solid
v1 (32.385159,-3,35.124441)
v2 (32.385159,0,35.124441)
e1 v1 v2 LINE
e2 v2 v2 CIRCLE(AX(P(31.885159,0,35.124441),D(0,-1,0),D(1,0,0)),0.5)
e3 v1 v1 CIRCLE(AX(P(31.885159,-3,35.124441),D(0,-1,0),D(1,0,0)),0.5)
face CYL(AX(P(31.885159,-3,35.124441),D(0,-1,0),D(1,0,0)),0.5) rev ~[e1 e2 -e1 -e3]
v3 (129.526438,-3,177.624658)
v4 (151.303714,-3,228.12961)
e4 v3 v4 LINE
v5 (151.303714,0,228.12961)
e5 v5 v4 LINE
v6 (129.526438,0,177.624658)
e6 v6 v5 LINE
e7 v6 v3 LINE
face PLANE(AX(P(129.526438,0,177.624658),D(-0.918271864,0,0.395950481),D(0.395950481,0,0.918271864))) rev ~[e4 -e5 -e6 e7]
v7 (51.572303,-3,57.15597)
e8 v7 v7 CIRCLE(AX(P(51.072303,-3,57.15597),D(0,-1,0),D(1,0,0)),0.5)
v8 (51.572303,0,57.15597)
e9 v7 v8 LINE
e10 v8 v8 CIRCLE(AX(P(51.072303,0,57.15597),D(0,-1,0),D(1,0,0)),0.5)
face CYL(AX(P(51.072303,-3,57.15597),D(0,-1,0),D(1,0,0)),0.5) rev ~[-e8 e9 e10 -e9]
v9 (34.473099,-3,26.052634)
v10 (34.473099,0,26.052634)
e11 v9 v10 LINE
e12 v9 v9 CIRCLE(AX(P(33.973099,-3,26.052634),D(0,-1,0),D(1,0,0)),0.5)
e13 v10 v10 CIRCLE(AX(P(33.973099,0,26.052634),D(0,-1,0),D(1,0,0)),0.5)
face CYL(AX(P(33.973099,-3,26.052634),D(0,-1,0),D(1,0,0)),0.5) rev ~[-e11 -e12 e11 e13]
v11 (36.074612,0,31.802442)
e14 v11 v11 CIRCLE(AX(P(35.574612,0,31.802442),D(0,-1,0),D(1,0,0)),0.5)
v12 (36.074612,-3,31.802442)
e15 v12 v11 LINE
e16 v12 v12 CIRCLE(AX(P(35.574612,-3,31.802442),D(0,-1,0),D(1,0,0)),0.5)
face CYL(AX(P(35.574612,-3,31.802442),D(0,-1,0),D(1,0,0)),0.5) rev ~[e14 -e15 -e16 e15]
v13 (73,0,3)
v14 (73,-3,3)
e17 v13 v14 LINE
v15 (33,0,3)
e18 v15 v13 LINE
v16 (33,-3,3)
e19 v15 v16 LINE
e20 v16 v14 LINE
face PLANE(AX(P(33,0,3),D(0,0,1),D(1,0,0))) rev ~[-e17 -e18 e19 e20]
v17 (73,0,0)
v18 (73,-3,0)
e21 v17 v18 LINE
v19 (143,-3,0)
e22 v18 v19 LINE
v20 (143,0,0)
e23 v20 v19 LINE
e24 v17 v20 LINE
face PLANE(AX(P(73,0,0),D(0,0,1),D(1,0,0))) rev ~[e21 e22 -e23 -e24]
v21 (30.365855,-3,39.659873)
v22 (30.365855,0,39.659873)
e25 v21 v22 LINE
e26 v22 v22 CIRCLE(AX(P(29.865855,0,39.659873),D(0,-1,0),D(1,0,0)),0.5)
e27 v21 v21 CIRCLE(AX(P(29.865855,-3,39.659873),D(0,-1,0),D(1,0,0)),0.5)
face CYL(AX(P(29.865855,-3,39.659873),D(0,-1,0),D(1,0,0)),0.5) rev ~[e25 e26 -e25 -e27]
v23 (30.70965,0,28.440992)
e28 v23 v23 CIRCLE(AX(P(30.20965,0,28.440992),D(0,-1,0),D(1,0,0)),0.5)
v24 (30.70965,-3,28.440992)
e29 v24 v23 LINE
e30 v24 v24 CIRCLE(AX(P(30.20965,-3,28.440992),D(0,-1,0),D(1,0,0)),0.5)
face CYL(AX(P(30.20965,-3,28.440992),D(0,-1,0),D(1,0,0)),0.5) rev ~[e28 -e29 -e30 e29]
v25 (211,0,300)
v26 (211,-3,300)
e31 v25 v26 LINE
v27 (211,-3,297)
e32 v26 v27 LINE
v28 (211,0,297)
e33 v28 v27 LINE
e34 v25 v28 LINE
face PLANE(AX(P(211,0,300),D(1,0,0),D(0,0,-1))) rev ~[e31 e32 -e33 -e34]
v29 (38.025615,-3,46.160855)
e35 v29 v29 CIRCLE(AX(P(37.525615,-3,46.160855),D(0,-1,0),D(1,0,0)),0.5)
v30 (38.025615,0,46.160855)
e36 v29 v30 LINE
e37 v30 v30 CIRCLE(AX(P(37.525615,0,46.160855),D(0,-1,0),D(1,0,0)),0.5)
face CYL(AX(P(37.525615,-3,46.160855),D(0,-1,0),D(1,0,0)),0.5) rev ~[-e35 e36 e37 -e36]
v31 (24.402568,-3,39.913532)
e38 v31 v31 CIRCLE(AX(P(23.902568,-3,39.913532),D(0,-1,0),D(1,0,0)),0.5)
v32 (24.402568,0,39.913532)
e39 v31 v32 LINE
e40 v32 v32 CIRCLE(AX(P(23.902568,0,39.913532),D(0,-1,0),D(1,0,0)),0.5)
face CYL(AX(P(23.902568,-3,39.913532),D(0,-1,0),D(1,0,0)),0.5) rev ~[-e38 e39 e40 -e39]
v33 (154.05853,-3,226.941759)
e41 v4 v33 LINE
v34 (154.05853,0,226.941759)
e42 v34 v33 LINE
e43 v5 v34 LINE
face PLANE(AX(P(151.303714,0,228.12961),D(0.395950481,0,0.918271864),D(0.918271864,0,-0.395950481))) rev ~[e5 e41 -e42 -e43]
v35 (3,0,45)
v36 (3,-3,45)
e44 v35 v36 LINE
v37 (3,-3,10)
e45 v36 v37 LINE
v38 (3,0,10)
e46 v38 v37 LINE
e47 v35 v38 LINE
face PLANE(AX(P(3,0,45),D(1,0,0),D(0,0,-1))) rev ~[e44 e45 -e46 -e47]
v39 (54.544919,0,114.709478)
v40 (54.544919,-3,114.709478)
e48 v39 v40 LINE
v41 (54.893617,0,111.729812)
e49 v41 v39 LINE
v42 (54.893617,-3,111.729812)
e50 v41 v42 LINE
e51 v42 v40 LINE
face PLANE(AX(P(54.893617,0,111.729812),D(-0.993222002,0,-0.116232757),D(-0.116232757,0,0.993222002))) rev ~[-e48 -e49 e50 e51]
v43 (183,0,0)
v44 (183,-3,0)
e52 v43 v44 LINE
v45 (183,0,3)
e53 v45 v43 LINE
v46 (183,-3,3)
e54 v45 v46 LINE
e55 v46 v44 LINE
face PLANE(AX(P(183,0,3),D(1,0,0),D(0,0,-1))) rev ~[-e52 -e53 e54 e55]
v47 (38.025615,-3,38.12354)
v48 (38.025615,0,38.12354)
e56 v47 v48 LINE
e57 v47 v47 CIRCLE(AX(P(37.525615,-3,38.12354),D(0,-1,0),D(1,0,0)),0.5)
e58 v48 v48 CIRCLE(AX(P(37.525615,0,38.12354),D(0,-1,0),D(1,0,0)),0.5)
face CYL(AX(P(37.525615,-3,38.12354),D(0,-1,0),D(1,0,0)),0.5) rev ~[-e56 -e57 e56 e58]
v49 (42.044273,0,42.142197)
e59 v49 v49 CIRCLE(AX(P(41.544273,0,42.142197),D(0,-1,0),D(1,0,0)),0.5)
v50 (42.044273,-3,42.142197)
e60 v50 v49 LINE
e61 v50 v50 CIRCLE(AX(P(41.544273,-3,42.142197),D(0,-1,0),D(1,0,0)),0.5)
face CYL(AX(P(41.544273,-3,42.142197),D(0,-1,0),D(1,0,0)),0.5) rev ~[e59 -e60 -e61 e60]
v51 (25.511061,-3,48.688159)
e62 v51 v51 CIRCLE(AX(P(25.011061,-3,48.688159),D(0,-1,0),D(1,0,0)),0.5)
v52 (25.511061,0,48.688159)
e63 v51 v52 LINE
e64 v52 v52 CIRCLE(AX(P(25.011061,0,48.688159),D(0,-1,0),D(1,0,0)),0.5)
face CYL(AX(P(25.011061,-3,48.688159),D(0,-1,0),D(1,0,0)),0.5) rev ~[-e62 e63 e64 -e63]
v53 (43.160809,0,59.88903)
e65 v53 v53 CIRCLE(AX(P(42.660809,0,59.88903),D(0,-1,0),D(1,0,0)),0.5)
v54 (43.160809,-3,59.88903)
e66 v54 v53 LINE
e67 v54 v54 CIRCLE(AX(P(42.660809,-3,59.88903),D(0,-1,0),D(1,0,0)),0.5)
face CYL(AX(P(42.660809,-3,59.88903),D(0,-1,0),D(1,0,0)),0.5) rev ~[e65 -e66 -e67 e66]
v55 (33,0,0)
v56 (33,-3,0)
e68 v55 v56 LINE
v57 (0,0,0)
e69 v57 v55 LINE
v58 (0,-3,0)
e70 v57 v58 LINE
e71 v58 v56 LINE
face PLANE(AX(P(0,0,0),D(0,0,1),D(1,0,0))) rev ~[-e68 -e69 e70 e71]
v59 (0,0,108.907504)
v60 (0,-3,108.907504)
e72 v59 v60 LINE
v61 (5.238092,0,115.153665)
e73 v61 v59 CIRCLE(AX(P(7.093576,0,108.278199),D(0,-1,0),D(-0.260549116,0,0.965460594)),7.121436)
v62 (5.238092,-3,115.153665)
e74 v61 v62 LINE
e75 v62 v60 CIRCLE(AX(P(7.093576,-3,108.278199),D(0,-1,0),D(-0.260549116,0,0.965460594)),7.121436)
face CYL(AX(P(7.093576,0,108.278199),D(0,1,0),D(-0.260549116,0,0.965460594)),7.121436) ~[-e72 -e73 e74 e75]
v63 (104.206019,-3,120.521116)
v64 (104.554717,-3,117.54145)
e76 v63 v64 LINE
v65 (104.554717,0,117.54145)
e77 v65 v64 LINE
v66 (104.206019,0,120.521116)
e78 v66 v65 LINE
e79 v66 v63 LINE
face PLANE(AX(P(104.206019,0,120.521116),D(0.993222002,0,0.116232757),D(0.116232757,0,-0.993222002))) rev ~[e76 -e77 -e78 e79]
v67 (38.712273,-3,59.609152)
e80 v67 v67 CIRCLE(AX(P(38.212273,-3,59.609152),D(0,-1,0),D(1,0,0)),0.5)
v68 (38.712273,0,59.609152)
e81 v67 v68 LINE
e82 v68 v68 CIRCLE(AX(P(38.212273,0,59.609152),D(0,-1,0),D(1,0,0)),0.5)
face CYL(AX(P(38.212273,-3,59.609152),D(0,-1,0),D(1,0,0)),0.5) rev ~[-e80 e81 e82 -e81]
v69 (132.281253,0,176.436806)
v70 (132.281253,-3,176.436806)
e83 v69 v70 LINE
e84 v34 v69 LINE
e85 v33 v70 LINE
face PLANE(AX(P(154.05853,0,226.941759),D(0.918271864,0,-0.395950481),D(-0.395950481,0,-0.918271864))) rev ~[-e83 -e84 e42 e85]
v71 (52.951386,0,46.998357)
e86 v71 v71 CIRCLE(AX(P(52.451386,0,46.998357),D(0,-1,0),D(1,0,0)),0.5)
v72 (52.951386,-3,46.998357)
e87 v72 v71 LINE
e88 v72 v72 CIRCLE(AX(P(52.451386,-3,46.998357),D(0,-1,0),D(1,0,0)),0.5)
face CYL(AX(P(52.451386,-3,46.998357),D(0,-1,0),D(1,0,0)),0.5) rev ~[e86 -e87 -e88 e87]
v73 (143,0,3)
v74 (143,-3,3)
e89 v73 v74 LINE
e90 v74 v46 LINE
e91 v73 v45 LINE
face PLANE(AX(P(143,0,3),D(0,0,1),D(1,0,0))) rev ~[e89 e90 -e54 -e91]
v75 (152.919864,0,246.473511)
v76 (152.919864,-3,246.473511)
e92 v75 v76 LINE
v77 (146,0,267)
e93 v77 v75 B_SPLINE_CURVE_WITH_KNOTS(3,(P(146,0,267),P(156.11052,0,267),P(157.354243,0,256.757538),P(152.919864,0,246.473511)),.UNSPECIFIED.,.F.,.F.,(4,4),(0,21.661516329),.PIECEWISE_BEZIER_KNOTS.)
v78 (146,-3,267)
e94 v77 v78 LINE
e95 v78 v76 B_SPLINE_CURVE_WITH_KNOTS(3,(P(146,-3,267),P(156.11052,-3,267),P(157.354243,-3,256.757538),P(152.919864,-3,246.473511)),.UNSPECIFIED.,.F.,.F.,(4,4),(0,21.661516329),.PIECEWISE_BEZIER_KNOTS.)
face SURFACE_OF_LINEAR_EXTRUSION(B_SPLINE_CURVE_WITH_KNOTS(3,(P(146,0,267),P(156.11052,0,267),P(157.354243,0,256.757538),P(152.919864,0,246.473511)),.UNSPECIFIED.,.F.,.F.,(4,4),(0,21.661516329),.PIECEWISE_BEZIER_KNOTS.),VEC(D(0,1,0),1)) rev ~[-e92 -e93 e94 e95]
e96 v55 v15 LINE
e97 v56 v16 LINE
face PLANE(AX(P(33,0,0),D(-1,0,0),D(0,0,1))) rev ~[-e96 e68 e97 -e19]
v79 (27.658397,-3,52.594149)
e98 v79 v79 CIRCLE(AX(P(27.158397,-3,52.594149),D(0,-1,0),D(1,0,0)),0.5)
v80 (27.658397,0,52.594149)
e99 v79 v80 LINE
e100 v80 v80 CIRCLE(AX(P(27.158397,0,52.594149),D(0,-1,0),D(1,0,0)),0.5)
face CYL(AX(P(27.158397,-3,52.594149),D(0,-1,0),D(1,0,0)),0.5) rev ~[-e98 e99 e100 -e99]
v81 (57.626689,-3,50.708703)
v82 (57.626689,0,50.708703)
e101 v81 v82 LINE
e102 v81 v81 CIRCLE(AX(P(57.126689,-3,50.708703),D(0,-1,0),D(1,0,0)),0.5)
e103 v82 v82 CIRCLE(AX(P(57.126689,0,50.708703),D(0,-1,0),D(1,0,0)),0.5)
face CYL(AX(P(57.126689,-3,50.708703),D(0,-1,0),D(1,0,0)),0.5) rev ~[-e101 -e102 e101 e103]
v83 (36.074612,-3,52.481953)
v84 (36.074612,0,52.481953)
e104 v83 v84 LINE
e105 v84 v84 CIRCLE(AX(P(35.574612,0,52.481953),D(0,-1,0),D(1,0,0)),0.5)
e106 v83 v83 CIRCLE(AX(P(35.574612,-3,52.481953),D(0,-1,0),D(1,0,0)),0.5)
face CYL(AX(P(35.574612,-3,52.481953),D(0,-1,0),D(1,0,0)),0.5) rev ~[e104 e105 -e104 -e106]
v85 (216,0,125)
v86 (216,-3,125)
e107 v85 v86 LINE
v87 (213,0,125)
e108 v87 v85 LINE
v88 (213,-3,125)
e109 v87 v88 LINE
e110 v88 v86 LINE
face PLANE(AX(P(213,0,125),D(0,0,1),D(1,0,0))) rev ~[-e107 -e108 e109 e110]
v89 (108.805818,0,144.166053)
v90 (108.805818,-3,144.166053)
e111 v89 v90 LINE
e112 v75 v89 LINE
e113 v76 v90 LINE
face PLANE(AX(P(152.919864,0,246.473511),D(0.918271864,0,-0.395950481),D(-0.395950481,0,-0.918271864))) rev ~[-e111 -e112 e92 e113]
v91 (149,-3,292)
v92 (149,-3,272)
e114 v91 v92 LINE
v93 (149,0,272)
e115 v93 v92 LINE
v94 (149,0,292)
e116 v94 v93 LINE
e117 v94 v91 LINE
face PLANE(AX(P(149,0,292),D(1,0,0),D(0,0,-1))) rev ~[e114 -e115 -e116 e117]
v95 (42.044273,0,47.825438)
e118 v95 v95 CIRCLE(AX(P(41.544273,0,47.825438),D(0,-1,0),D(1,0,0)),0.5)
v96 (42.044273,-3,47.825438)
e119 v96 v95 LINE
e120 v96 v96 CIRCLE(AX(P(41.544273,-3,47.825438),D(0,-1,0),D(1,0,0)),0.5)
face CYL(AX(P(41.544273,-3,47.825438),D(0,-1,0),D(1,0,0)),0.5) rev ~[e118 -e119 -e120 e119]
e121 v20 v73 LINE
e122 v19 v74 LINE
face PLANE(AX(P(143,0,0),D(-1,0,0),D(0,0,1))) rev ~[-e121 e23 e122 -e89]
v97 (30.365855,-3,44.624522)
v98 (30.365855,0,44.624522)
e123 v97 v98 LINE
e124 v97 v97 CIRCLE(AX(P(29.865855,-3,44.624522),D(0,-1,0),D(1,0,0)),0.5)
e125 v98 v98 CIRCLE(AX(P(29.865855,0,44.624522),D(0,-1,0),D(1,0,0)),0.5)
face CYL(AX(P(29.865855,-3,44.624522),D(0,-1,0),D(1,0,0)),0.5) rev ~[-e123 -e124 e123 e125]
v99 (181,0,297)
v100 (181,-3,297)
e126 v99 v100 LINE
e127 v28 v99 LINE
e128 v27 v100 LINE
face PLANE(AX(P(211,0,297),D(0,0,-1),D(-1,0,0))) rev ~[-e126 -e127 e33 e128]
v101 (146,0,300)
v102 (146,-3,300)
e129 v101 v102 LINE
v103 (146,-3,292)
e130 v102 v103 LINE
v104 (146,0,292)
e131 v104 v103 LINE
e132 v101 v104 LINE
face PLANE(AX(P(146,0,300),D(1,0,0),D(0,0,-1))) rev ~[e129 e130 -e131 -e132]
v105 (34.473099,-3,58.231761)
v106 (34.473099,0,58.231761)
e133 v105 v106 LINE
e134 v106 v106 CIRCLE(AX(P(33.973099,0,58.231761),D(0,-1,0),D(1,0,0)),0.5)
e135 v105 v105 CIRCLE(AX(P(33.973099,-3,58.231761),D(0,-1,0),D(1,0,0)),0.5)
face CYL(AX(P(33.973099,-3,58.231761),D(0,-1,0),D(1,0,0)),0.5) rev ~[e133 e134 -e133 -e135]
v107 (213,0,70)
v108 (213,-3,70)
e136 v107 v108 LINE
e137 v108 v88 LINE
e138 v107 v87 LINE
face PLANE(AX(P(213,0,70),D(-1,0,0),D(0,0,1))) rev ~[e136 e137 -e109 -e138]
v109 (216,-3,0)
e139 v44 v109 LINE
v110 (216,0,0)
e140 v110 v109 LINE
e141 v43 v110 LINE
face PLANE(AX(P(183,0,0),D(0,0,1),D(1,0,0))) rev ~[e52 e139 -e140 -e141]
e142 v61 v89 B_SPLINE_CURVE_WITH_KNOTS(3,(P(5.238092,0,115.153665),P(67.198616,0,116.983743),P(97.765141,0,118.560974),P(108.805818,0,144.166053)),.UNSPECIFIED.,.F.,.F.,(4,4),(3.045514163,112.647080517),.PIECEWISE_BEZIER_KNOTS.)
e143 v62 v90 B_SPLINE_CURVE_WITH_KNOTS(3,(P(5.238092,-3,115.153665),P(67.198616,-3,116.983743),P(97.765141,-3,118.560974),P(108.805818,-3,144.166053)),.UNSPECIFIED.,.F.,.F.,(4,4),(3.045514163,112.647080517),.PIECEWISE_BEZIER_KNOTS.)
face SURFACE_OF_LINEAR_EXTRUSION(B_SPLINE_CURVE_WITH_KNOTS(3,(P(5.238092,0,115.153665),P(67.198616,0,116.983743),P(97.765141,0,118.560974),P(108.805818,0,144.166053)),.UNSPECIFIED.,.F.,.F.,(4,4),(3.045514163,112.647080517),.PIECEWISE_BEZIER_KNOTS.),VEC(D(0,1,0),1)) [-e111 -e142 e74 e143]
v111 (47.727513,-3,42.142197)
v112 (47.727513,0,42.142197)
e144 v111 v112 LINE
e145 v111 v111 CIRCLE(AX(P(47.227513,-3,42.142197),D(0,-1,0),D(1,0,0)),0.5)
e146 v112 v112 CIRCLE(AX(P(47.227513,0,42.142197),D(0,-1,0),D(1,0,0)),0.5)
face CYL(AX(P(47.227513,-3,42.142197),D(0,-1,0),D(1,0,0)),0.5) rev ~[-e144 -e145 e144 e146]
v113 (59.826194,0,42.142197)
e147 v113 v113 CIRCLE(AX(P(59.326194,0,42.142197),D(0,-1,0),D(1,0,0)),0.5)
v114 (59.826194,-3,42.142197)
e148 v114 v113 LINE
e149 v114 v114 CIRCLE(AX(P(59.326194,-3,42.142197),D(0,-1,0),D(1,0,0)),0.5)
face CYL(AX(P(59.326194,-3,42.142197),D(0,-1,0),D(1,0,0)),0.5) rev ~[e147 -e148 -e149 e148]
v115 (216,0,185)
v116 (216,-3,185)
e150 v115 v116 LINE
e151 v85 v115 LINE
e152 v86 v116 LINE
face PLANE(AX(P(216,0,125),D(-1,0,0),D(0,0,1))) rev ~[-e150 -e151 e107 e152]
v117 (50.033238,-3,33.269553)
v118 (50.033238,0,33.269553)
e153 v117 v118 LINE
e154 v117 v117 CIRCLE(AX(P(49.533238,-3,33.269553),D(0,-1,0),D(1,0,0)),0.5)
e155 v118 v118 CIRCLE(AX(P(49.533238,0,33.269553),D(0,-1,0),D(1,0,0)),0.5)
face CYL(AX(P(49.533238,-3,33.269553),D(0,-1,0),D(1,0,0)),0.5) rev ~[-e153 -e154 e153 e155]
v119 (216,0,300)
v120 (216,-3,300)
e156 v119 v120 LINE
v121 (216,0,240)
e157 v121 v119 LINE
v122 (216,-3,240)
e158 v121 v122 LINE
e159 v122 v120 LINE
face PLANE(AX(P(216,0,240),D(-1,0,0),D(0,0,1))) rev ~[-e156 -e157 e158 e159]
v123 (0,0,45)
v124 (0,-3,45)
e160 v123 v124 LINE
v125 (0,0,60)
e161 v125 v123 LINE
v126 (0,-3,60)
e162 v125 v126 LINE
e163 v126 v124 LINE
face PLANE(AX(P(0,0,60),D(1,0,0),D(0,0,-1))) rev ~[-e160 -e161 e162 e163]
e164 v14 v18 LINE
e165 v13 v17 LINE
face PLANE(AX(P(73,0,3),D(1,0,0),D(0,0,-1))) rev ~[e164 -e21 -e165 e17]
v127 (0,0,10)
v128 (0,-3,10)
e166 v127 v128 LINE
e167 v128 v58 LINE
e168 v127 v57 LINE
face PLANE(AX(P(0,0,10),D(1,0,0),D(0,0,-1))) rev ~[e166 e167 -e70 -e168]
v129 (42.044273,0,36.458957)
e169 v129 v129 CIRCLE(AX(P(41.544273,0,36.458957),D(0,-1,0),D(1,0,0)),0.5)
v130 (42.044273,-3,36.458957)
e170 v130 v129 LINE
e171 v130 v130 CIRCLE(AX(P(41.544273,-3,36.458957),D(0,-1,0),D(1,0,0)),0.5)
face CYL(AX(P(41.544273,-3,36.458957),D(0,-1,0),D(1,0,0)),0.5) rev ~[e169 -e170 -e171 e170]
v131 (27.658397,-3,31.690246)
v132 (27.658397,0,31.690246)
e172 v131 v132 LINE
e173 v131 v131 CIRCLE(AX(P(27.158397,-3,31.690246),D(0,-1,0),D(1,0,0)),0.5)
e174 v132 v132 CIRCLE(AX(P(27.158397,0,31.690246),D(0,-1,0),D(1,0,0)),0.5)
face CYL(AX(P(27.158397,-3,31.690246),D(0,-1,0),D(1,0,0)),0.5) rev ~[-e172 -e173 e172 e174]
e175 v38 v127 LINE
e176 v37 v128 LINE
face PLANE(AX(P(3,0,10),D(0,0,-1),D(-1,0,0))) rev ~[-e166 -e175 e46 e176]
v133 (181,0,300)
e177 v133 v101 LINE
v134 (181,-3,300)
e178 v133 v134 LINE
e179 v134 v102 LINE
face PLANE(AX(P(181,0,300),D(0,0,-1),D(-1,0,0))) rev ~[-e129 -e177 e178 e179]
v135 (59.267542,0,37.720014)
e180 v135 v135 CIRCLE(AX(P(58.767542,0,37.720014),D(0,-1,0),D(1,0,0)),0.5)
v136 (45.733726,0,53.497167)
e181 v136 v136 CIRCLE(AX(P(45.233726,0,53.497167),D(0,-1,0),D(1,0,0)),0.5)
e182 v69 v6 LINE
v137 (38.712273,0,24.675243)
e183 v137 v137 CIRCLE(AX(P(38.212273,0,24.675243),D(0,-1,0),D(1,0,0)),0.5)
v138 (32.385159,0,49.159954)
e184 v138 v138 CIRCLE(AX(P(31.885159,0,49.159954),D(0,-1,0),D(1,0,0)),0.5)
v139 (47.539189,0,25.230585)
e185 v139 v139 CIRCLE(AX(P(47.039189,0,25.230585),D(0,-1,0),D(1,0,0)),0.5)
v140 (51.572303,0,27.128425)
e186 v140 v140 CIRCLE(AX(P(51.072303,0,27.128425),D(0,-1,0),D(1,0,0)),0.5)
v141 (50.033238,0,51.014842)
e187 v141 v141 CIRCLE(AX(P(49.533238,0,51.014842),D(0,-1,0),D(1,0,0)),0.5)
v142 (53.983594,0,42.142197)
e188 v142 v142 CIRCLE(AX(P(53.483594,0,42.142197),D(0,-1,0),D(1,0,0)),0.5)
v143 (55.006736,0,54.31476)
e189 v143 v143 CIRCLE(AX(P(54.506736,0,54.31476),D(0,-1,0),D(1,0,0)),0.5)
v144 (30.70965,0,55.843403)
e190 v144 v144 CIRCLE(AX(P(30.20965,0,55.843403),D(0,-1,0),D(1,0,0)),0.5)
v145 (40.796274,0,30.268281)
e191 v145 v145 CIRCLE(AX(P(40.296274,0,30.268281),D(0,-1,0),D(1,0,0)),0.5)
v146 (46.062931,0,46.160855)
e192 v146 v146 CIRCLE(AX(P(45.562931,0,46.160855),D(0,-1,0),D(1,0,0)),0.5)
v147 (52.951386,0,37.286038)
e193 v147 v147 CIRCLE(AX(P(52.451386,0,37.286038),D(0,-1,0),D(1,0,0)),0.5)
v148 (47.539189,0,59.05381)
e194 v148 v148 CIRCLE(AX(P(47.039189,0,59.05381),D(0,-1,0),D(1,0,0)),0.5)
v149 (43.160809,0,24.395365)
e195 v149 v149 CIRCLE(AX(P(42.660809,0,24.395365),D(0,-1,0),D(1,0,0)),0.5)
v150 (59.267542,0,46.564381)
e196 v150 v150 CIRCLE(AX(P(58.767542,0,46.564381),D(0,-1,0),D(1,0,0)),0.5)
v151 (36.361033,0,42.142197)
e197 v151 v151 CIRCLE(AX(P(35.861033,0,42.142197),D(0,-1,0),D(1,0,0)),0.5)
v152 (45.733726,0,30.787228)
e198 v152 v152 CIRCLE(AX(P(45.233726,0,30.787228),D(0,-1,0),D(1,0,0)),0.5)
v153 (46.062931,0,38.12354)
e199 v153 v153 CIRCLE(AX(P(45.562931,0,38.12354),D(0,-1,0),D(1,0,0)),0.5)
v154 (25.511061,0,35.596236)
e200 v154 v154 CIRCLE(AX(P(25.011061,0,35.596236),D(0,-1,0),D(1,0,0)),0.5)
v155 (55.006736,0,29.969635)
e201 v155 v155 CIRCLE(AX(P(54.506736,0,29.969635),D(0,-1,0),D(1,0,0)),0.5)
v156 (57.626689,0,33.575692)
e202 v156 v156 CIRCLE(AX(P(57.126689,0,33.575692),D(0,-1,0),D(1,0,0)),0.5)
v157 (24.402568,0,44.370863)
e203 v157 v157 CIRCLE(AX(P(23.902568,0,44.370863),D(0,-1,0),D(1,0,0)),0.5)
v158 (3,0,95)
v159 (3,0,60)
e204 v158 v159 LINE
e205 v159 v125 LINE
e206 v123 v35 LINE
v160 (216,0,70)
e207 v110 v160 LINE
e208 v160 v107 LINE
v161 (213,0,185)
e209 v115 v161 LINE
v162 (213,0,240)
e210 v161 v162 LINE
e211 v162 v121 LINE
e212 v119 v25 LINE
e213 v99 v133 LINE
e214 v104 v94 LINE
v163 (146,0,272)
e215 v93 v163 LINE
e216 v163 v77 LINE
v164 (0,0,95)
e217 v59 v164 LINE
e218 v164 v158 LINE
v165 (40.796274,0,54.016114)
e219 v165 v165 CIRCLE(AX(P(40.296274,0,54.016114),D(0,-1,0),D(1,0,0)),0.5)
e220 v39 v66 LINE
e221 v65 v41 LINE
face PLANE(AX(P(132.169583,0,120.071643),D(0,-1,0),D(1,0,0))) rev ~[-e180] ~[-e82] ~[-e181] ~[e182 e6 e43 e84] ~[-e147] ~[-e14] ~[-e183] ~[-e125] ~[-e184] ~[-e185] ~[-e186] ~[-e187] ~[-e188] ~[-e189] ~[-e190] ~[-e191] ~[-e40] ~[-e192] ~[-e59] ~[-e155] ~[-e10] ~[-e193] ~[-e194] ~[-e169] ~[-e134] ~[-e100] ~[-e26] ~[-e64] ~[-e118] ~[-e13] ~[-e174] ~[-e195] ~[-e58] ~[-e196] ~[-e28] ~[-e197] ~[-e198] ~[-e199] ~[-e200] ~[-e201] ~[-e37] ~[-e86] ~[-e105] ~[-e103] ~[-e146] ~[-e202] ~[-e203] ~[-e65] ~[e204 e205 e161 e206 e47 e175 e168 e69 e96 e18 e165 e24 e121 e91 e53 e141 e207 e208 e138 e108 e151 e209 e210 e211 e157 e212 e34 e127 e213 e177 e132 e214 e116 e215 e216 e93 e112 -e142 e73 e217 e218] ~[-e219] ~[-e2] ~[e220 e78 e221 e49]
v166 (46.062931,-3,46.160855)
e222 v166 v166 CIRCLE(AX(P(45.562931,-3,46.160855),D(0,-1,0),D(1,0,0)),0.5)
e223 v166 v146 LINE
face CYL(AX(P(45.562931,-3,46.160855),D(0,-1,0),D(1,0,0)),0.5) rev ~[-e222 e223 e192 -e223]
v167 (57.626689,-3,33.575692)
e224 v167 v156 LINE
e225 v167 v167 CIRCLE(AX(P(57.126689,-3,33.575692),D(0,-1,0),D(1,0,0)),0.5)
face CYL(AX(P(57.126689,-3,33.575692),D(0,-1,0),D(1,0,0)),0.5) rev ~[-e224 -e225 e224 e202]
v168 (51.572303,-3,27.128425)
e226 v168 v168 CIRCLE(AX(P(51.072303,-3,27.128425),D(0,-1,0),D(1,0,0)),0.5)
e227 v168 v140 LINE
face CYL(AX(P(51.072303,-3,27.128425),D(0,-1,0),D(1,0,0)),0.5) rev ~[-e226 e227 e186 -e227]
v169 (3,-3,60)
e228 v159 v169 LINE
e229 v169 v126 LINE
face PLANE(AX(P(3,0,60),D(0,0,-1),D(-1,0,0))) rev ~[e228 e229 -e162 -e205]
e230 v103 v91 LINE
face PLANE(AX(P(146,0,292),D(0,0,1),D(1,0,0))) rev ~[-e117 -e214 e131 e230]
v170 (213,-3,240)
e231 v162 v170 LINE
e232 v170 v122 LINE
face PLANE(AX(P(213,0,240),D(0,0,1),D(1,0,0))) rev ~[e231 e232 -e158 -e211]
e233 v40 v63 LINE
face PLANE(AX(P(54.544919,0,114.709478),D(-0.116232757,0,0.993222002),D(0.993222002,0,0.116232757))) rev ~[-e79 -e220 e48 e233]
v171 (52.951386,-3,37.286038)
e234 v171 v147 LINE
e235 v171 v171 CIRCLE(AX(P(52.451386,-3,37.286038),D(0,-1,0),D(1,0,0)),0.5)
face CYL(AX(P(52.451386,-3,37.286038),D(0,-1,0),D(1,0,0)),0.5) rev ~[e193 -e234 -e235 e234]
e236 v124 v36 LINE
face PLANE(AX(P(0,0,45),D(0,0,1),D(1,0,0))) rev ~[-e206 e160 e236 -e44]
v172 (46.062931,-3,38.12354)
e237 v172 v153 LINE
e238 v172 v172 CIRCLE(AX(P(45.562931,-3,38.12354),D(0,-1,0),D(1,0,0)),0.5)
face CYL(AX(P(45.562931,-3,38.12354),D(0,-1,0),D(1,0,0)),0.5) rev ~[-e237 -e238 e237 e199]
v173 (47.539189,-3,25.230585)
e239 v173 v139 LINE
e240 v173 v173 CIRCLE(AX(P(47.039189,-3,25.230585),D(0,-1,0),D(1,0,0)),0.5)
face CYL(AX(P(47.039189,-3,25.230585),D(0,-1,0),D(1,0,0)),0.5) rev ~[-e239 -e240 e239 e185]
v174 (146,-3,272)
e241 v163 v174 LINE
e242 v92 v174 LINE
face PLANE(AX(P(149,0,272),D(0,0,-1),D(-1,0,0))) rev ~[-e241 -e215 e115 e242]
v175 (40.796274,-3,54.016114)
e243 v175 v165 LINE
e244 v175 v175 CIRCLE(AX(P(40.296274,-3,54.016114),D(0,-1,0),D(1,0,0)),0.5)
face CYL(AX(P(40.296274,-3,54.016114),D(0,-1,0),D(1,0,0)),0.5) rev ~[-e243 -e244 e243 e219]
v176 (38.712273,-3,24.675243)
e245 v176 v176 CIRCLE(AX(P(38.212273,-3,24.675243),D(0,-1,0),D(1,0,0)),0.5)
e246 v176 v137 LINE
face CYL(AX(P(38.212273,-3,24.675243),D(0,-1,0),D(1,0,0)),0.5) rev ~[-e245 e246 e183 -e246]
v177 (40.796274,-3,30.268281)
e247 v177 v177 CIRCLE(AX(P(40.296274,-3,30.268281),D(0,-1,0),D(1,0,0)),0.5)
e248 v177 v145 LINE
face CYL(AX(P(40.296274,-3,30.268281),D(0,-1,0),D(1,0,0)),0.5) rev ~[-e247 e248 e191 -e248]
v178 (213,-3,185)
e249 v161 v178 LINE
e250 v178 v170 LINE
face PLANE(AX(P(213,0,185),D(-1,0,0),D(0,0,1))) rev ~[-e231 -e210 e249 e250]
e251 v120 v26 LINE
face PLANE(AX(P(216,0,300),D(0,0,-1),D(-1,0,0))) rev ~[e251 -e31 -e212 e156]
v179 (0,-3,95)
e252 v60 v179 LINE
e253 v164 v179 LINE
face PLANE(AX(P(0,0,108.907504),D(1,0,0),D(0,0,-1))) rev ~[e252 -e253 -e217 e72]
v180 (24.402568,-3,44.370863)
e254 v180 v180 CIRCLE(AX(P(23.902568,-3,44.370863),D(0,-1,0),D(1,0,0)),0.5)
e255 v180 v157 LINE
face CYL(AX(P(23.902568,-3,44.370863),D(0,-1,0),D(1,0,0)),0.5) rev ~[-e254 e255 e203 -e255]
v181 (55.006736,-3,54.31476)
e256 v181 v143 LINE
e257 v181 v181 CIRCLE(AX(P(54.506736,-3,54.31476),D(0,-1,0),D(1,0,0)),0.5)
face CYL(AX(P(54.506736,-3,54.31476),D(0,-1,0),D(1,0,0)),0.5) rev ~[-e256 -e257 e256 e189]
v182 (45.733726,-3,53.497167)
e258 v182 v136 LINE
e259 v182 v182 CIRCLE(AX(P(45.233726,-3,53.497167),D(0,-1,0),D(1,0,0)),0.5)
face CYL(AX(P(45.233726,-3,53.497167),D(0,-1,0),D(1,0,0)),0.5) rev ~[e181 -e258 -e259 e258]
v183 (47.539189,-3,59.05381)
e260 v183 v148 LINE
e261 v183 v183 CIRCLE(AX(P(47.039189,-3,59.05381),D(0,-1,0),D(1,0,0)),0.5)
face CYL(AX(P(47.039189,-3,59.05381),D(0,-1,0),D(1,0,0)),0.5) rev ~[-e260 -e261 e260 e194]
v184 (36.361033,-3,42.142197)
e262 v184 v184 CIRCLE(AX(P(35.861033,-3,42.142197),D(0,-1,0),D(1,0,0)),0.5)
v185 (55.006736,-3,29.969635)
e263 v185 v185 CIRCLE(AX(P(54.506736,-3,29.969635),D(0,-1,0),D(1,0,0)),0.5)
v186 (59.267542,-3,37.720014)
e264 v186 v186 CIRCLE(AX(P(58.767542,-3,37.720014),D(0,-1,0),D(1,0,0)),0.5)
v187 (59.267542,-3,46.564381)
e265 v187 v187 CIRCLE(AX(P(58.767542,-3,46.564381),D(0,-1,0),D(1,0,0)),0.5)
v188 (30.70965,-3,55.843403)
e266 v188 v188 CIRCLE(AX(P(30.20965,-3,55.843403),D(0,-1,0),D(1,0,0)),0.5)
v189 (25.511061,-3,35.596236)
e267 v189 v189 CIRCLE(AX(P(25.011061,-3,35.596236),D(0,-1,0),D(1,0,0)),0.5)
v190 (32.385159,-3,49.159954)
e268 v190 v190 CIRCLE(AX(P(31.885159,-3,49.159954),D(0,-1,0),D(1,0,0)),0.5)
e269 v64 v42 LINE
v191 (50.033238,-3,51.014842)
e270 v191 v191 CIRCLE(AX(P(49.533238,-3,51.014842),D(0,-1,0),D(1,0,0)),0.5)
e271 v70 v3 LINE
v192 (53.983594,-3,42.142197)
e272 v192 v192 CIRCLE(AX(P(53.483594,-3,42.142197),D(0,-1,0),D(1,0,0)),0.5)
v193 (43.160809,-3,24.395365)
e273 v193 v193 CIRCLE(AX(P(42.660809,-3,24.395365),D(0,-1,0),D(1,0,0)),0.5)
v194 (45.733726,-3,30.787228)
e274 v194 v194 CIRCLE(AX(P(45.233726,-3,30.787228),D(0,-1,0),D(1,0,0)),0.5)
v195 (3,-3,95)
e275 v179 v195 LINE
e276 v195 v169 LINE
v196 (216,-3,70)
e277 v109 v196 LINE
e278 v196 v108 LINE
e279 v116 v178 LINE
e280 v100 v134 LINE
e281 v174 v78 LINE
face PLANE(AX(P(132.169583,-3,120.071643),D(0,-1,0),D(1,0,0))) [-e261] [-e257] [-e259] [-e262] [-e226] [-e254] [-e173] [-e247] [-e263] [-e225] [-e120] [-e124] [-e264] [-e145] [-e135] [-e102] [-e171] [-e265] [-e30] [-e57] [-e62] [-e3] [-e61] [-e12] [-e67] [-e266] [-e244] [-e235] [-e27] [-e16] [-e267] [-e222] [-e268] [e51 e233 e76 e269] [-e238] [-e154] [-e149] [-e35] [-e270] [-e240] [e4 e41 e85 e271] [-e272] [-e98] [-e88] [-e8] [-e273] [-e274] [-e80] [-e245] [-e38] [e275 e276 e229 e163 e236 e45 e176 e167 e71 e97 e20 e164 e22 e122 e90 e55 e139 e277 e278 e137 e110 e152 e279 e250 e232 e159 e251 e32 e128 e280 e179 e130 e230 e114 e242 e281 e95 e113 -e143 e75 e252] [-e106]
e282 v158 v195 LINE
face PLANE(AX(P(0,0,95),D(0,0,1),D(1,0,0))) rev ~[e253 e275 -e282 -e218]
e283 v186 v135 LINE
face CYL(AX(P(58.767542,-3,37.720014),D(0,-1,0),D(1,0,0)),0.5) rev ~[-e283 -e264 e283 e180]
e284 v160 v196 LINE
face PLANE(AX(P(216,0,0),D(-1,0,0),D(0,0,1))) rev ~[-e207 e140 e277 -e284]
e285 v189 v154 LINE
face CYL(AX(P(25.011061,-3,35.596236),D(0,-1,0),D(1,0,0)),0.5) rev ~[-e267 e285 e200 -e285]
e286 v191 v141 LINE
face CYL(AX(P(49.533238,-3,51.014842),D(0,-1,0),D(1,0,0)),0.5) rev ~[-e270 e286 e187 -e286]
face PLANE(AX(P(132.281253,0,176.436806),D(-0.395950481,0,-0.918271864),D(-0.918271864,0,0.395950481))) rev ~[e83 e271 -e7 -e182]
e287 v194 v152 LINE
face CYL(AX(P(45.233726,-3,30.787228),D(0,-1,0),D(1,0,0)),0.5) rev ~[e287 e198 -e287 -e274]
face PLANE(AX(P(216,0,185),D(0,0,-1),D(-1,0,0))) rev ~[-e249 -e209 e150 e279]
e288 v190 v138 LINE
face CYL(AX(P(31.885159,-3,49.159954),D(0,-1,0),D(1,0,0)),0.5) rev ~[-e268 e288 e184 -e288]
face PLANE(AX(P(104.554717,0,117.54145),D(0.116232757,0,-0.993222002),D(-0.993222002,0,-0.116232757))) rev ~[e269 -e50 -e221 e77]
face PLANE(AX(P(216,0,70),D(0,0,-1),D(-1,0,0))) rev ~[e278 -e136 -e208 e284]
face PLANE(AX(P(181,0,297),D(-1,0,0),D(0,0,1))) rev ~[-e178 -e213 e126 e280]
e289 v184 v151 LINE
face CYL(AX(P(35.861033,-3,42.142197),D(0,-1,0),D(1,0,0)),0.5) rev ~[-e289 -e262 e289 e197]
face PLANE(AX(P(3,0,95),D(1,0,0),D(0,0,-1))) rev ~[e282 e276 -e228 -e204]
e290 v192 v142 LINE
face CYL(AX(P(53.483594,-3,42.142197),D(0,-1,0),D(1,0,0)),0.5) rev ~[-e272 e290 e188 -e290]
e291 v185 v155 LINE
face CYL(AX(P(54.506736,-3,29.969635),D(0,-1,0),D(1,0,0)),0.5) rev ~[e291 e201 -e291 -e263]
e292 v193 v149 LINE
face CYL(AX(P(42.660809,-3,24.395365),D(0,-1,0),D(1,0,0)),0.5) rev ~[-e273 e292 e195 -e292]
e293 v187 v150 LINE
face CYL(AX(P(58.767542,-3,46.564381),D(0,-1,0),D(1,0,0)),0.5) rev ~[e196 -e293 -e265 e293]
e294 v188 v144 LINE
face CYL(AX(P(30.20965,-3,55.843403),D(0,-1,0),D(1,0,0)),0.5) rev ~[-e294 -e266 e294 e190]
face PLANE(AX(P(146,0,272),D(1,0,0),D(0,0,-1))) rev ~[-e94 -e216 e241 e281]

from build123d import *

# Parameters (mm, degrees)
F1_DEPTH = 3
F2_R     = 0.5
F3_DEPTH = 3


# Not quite as in the source:
# - a feature names something its author has since deleted; it is built from what else it names


with BuildPart() as f1:
    # F0 (on Front) → F1 (new body)
    with BuildSketch(Plane.XZ):
        with BuildLine():
            Line((0, 10), (0, 0))
            Line((0, 0), (33, 0))
            Line((33, 0), (33, 3))
            Line((33, 3), (73, 3))
            Line((73, 3), (73, 0))
            Line((73, 0), (143, 0))
            Line((143, 0), (143, 3))
            Line((143, 3), (183, 3))
            Line((183, 3), (183, 0))
            Line((183, 0), (216, 0))
            Line((216, 0), (216, 70))
            Line((216, 70), (213, 70))
            Line((213, 70), (213, 125))
            Line((213, 125), (216, 125))
            Line((216, 125), (216, 185))
            Line((216, 185), (213, 185))
            Line((213, 185), (213, 240))
            Line((213, 240), (216, 240))
            Line((216, 240), (216, 300))
            Line((216, 300), (211, 300))
            Line((211, 300), (211, 297))
            Line((211, 297), (181, 297))
            Line((181, 297), (181, 300))
            Line((181, 300), (176, 300))
            Line((176, 300), (174.706427271, 297))
            Line((174.706427271, 297), (161.7706999809, 267))
            Line((161.7706999809, 267), (152.9198643438, 246.4735105991))
            Line((152.9198643438, 246.4735105991), (108.8058184443, 144.1660525563))
            add(Edge.make_bspline(
                [(5.2380922861, 115.1536645525), (67.1986155562, 116.9837427001), (97.7651412543, 118.5609738259), (108.8058184443, 144.1660525563)],
                knots=[3.0455141627, 3.0455141627, 3.0455141627, 3.0455141627, 112.6470805172, 112.6470805172, 112.6470805172, 112.6470805172], degree=3))
            ThreePointArc((5.2380922861, 115.1536645525), (1.636924279, 112.8542013763), (0, 108.9075039192))
            Line((0, 108.9075039192), (0, 107.6488941908))
            Line((0, 107.6488941908), (0, 95))
            Line((0, 95), (3, 95))
            Line((3, 95), (3, 60))
            Line((3, 60), (0, 60))
            Line((0, 60), (0, 45))
            Line((0, 45), (3, 45))
            Line((3, 45), (3, 10))
            Line((3, 10), (0, 10))
        make_face()
        Polygon((54.8936169141, 111.7298124622), (54.5449186418, 114.7094784694), (104.2060187631, 120.5211163403), (104.5547170354, 117.541450333), align=None, mode=Mode.SUBTRACT)
        Polygon((129.52643753, 177.6246576271), (151.3037139596, 228.1296101695), (154.0585295529, 226.9417587279), (132.2812531233, 176.4368061855), align=None, mode=Mode.SUBTRACT)
        Polygon((146, 267), (161.7706999809, 267), (174.706427271, 297), (146, 297), (146, 292), (149, 292), (149, 272), (146, 272), align=None)
        Polygon((146, 297), (174.706427271, 297), (176, 300), (146, 300), align=None)
        with BuildLine():
            add(Edge.make_bspline(
                [(146, 267), (156.1105200986, 267), (157.3542433109, 256.7575376221), (152.9198643438, 246.4735105991)],
                knots=[0, 0, 0, 0, 21.6615163288, 21.6615163288, 21.6615163288, 21.6615163288], degree=3))
            Line((152.9198643438, 246.4735105991), (161.7706999809, 267))
            Line((161.7706999809, 267), (146, 267))
        make_face()
    extrude(amount=F1_DEPTH)

    # F2 (on face) → F3 (cut, through all)
    with BuildSketch(Plane.XZ.offset(3)):
        with Locations((41.5442730218, 42.1421974897)):
            Circle(F2_R)
        with Locations((47.2275130451, 42.1421974897)):
            Circle(F2_R)
        with Locations((53.483594209, 42.1421974897)):
            Circle(F2_R)
        with Locations((59.3261942267, 42.1421974897)):
            Circle(F2_R)
        with Locations((45.5629305814, 46.1608550493)):
            Circle(F2_R)
        with Locations((41.5442730218, 47.825437513)):
            Circle(F2_R)
        with Locations((37.5256154622, 46.1608550493)):
            Circle(F2_R)
        with Locations((35.8610329985, 42.1421974897)):
            Circle(F2_R)
        with Locations((37.5256154622, 38.1235399302)):
            Circle(F2_R)
        with Locations((41.5442730218, 36.4589574665)):
            Circle(F2_R)
        with Locations((45.5629305814, 38.1235399302)):
            Circle(F2_R)
        with Locations((52.4513856597, 46.99835691)):
            Circle(F2_R)
        with Locations((49.5332382473, 51.0148422497)):
            Circle(F2_R)
        with Locations((45.2337261699, 53.4971667049)):
            Circle(F2_R)
        with Locations((40.2962741256, 54.0161138262)):
            Circle(F2_R)
        with Locations((35.5746124282, 52.4819529418)):
            Circle(F2_R)
        with Locations((31.8851592801, 49.1599544059)):
            Circle(F2_R)
        with Locations((29.8658546482, 44.624521945)):
            Circle(F2_R)
        with Locations((29.8658546482, 39.6598730345)):
            Circle(F2_R)
        with Locations((31.8851592801, 35.1244405735)):
            Circle(F2_R)
        with Locations((35.5746124282, 31.8024420377)):
            Circle(F2_R)
        with Locations((40.2962741256, 30.2682811533)):
            Circle(F2_R)
        with Locations((45.2337261699, 30.7872282745)):
            Circle(F2_R)
        with Locations((49.5332382473, 33.2695527298)):
            Circle(F2_R)
        with Locations((52.4513856597, 37.2860380695)):
            Circle(F2_R)
        with Locations((58.7675424734, 46.5643814678)):
            Circle(F2_R)
        with Locations((57.1266893577, 50.7087033628)):
            Circle(F2_R)
        with Locations((54.5067357155, 54.3147601884)):
            Circle(F2_R)
        with Locations((51.0723028696, 57.1559701322)):
            Circle(F2_R)
        with Locations((47.0391888668, 59.053809524)):
            Circle(F2_R)
        with Locations((42.6608090925, 59.8890301351)):
            Circle(F2_R)
        with Locations((38.2122732505, 59.6091519828)):
            Circle(F2_R)
        with Locations((33.9730992085, 58.2317608408)):
            Circle(F2_R)
        with Locations((30.2096498619, 55.8434032602)):
            Circle(F2_R)
        with Locations((27.1583965743, 52.5941485314)):
            Circle(F2_R)
        with Locations((25.0110608115, 48.6881592792)):
            Circle(F2_R)
        with Locations((23.9025675767, 44.3708631733)):
            Circle(F2_R)
        with Locations((23.9025675767, 39.9135318061)):
            Circle(F2_R)
        with Locations((25.0110608115, 35.5962357003)):
            Circle(F2_R)
        with Locations((27.1583965743, 31.690246448)):
            Circle(F2_R)
        with Locations((30.2096498619, 28.4409917193)):
            Circle(F2_R)
        with Locations((33.9730992085, 26.0526341387)):
            Circle(F2_R)
        with Locations((38.2122732505, 24.6752429966)):
            Circle(F2_R)
        with Locations((42.6608090925, 24.3953648444)):
            Circle(F2_R)
        with Locations((47.0391888668, 25.2305854555)):
            Circle(F2_R)
        with Locations((51.0723028696, 27.1284248473)):
            Circle(F2_R)
        with Locations((54.5067357155, 29.969634791)):
            Circle(F2_R)
        with Locations((57.1266893577, 33.5756916167)):
            Circle(F2_R)
        with Locations((58.7675424734, 37.7200135117)):
            Circle(F2_R)
    extrude(amount=-F3_DEPTH, mode=Mode.SUBTRACT)


solid = f1.part
